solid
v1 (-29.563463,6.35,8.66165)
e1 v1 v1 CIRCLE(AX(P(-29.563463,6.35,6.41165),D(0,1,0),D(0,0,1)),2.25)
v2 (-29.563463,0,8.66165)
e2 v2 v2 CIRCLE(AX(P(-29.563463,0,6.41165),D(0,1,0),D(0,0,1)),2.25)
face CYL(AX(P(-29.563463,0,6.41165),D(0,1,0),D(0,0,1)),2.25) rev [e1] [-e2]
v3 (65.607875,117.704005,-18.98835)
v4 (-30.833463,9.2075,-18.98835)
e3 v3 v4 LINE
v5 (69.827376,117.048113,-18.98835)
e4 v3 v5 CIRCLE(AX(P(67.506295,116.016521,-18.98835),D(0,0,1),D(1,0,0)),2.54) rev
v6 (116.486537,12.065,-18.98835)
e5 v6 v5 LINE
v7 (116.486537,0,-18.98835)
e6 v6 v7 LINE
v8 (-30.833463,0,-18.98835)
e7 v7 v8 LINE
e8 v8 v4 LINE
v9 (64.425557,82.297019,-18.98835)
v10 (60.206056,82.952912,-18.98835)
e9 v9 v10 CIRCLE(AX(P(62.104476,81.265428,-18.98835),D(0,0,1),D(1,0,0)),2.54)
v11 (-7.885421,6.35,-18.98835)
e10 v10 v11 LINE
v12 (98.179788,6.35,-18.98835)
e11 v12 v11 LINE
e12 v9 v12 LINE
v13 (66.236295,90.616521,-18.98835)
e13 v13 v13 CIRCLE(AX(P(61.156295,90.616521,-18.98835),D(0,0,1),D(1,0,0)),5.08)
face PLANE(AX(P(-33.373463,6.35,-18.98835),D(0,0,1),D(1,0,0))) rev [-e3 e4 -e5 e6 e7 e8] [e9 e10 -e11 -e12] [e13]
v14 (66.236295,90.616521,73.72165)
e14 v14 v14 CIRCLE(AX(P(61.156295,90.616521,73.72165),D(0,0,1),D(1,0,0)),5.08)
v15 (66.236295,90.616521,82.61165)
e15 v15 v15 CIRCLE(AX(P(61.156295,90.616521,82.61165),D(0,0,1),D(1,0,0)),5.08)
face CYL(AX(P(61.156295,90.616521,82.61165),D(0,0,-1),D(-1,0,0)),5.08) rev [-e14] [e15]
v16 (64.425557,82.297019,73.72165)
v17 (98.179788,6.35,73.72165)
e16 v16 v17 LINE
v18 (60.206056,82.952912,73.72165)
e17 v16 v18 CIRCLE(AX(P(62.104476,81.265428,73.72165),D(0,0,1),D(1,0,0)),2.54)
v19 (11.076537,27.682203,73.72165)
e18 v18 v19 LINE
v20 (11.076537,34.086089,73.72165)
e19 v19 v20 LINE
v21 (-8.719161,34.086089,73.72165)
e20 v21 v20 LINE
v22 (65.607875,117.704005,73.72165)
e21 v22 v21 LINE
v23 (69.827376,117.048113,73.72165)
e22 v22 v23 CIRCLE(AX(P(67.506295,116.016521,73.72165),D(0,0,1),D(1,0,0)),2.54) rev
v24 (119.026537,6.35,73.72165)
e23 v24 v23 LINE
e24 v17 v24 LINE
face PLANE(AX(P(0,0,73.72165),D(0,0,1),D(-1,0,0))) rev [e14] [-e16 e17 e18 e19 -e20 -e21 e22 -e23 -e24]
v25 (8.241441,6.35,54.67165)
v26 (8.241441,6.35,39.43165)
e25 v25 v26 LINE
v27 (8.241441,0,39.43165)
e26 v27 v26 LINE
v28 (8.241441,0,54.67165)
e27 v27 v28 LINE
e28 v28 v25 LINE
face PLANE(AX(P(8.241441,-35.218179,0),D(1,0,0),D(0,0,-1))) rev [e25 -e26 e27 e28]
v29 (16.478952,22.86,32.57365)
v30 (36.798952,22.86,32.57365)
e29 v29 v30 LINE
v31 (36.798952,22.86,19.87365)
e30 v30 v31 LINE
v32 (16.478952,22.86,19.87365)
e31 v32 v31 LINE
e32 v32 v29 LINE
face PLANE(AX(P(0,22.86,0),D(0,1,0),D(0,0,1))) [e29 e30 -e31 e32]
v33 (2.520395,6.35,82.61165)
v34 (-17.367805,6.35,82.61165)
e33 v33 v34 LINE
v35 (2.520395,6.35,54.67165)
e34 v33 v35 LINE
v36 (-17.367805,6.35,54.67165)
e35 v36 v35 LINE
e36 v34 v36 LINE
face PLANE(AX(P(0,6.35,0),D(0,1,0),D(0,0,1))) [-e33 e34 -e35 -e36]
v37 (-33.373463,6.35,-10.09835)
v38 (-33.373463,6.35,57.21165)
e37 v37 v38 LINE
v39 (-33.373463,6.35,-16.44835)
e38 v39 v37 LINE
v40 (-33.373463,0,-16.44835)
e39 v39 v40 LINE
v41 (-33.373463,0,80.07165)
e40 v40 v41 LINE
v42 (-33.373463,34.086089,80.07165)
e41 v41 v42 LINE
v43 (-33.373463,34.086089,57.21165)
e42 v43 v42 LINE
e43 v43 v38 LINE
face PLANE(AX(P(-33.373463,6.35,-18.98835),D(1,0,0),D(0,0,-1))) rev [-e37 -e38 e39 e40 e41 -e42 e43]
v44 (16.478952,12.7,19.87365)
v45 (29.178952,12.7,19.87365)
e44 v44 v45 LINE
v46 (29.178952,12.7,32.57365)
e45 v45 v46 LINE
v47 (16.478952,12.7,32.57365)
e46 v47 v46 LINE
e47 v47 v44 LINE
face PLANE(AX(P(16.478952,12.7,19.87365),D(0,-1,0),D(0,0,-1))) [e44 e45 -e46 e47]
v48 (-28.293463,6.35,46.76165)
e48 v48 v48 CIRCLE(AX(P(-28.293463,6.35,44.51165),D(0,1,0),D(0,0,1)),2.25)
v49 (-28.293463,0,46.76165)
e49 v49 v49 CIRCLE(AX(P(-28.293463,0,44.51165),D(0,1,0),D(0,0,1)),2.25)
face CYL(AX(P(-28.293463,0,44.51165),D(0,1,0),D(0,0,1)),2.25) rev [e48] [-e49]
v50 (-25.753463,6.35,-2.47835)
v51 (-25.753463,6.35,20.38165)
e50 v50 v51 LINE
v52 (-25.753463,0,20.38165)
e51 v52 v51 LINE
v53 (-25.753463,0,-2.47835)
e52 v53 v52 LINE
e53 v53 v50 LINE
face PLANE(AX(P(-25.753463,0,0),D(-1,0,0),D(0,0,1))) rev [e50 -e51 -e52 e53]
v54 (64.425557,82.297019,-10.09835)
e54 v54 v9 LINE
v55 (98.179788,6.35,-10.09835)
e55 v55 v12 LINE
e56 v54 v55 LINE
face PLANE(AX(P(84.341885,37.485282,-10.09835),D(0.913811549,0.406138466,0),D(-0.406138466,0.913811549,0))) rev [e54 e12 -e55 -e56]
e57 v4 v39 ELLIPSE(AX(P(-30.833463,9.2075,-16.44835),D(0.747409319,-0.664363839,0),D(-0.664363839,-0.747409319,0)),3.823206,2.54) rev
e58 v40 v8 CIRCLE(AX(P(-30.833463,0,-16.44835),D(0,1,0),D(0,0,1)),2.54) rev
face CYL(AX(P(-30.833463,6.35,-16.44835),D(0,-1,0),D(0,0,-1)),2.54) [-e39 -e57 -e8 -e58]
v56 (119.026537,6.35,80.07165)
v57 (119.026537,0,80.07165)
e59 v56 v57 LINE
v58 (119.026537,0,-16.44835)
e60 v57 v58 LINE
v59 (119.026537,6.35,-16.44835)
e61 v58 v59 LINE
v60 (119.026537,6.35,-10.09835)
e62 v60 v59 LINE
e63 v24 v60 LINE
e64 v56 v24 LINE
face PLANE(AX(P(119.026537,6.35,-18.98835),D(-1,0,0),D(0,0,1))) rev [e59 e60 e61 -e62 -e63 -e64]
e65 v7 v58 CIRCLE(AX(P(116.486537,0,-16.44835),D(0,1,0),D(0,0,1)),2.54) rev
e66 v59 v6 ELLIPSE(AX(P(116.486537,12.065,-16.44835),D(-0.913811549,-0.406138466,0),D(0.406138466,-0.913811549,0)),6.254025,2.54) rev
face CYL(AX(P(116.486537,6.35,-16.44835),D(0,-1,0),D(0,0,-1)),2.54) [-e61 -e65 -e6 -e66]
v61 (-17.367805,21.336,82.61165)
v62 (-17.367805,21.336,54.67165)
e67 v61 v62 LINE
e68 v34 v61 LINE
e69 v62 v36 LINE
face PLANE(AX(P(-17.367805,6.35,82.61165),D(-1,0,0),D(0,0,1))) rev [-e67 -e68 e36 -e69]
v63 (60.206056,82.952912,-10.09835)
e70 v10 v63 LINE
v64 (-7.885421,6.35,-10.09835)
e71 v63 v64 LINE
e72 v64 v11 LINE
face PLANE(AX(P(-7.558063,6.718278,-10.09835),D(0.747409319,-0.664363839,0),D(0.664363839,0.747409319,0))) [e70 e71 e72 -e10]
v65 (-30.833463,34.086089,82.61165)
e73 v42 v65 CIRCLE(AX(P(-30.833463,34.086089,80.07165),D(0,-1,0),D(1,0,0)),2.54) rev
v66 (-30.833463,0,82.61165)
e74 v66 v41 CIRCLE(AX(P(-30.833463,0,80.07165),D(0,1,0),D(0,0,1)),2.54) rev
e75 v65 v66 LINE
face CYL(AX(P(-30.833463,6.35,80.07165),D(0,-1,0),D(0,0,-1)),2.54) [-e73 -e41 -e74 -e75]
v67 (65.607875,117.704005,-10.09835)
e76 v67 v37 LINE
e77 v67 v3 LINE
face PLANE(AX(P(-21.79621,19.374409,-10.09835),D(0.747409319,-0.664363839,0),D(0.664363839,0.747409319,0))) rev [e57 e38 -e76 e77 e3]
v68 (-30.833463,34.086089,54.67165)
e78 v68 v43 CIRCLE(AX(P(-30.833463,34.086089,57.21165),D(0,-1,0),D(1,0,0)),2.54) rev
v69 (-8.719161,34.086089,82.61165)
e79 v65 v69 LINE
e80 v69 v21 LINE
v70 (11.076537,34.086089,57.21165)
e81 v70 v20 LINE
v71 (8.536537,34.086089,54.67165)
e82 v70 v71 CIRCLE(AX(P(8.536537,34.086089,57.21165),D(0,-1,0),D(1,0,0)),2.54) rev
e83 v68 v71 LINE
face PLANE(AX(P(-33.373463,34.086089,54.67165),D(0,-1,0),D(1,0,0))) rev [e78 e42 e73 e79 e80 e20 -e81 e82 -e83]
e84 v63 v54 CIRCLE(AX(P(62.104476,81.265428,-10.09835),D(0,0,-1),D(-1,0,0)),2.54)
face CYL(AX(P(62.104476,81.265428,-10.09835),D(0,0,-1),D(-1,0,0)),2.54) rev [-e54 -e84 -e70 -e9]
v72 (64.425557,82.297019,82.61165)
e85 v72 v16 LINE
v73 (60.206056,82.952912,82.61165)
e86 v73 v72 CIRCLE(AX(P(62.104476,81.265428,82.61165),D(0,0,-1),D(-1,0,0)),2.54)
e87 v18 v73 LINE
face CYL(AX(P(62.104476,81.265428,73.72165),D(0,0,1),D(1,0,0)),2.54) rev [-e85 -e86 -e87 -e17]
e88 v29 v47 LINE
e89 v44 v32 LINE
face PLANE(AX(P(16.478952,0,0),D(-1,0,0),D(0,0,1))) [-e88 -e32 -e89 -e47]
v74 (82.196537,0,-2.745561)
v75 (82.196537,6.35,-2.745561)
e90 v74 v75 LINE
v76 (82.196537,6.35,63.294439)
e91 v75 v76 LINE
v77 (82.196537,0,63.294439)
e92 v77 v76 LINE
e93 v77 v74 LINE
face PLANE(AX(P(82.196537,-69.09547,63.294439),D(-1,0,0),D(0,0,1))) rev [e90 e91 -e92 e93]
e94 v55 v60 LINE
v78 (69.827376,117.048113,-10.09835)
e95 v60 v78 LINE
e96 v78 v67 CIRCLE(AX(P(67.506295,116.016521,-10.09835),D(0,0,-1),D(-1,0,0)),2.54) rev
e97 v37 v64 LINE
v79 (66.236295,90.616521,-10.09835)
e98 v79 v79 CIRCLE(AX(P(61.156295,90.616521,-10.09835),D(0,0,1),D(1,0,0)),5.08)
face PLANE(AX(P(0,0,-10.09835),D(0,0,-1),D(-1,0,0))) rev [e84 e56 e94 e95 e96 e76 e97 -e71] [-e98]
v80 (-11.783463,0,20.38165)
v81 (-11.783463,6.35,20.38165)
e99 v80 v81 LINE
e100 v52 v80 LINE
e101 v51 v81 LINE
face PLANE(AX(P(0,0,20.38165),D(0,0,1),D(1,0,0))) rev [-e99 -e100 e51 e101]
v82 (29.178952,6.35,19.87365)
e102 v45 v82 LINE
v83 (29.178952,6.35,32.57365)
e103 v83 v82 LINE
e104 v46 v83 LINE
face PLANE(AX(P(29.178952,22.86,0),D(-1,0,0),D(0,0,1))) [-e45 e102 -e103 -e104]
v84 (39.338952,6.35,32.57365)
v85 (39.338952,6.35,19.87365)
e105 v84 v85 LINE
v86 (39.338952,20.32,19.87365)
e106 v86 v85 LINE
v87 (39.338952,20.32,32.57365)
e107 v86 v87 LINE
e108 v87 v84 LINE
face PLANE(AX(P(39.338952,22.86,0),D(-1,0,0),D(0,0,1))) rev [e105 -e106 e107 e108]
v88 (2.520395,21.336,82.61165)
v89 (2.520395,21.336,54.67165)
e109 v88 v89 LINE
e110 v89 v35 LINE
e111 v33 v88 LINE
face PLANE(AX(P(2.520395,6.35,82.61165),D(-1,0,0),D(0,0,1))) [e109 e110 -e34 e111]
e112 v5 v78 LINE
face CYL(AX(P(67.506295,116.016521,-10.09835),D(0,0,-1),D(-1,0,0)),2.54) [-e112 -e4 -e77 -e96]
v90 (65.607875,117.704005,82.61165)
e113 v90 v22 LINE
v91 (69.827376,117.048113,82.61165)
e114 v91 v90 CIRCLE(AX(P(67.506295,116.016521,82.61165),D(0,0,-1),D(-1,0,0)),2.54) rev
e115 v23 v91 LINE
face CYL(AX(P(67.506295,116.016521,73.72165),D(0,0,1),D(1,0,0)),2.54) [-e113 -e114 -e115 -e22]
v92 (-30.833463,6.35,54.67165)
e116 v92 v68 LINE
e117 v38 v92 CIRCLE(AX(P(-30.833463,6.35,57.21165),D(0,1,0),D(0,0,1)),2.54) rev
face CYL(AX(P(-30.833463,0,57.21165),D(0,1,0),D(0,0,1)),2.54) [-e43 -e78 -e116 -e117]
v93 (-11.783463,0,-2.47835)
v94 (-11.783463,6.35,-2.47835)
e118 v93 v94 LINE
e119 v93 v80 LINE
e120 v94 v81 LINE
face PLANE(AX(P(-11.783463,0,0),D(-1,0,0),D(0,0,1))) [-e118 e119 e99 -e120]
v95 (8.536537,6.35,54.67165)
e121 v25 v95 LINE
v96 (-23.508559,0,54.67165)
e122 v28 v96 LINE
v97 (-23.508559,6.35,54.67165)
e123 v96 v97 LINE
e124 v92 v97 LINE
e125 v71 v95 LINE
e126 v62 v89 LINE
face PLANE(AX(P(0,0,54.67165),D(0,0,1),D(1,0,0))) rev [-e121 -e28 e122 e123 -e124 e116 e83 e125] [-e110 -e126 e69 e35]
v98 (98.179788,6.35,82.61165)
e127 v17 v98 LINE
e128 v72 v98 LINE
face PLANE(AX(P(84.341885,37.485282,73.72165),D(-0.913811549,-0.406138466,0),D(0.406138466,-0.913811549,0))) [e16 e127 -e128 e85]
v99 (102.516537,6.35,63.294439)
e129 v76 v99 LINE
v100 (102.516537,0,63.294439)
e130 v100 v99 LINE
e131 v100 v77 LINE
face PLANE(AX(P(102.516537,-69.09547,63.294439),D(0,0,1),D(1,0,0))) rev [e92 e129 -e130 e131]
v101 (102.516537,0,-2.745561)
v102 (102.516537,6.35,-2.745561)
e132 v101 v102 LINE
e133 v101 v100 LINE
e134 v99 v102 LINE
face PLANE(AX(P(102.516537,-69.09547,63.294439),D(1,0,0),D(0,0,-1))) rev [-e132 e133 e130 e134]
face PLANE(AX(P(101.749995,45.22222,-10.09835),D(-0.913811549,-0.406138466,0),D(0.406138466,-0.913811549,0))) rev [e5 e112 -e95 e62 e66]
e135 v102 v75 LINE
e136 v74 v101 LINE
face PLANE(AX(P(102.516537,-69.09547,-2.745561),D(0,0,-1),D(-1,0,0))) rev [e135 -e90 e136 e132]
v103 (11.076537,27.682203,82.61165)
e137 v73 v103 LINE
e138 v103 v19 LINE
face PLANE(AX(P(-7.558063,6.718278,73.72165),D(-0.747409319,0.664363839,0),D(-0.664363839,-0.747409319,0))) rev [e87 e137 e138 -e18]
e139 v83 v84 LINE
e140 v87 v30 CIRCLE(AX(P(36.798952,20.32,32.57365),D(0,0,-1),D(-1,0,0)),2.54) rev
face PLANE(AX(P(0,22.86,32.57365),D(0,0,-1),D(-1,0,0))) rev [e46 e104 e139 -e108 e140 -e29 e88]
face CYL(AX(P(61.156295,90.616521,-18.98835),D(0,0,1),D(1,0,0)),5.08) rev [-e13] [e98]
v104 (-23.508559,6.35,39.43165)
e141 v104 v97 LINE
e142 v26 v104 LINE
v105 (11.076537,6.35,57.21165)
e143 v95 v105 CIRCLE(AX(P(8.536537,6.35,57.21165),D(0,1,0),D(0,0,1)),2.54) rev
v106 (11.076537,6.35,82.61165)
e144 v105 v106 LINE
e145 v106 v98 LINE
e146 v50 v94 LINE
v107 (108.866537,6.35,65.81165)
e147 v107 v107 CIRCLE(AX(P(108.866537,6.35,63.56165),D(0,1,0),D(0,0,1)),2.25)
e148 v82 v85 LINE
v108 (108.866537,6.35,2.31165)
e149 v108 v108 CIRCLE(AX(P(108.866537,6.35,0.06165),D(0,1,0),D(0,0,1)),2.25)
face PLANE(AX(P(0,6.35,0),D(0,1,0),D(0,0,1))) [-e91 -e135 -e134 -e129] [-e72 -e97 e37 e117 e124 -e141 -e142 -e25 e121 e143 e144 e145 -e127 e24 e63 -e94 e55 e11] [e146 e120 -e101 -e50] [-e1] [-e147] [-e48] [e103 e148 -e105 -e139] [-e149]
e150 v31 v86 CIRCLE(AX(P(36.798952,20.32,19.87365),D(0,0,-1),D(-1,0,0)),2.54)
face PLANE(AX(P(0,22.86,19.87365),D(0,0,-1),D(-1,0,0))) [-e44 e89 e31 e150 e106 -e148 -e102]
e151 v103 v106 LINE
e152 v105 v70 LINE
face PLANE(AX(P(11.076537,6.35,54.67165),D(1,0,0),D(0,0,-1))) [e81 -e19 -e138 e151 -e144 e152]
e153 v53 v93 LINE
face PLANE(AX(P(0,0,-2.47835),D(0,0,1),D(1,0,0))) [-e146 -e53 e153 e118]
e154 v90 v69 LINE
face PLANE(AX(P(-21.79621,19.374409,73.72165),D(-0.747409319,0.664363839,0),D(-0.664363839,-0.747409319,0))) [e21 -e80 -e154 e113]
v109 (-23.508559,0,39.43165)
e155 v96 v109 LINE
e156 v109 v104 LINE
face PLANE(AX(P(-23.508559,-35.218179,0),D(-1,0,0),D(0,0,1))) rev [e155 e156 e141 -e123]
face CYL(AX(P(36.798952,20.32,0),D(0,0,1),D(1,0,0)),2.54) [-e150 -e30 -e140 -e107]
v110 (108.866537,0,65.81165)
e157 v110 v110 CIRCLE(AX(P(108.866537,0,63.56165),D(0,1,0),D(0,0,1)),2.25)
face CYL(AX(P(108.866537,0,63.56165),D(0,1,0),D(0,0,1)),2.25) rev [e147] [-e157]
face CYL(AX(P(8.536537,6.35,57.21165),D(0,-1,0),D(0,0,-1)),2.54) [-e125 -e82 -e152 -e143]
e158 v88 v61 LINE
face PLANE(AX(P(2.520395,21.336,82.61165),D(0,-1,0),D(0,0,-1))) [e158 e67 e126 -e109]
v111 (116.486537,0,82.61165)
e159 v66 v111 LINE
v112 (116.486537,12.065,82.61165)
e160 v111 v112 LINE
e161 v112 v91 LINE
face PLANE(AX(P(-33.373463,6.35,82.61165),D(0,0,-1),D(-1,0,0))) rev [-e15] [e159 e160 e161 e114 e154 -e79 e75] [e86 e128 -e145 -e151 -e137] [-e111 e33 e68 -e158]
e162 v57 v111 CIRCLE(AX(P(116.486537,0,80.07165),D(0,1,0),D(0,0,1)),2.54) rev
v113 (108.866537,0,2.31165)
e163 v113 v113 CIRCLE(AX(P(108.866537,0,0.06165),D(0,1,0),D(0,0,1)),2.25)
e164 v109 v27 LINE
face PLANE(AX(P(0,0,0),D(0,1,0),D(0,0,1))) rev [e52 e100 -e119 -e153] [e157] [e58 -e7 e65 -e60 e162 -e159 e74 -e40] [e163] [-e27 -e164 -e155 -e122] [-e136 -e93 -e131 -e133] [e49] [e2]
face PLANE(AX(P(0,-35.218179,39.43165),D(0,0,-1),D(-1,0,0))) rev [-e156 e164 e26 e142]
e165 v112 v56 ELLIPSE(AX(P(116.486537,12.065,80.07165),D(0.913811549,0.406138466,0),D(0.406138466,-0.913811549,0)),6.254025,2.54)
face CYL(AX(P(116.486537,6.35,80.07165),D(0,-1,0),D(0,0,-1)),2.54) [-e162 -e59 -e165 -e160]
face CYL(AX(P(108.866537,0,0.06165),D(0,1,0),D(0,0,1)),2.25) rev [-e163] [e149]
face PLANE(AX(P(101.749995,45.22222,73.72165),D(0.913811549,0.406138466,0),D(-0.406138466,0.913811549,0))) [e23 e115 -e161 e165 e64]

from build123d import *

# Parameters (mm, degrees)
SKETCH2_W               = 152.4
SKETCH2_H               = 101.6
BOSS_EXTRUDE1_DEPTH     = 6.35
BOSS_EXTRUDE2_DEPTH     = 8.89
FILLET1_R               = 2.54
SKETCH5_R               = 5.08
CUT_EXTRUDE1_DEPTH      = 192.880455786
MIRROR1_START           = 73.721650485
MIRROR1_OUTLINE_R       = 5.08
MIRROR1_DEPTH           = 8.89
SKETCH12_W              = 44.45
SKETCH12_H              = 27.736089271
BOSS_EXTRUDE4_DEPTH     = 19.05
BOSS_EXTRUDE5_DEPTH     = 8.89
CUT_EXTRUDE4_DEPTH      = 19.05
CUT_EXTRUDE4_DEPTH_BACK = 192.880455786
SKETCH12_4_W            = 19.8882
SKETCH12_4_H            = 14.986
CUT_EXTRUDE5_DEPTH      = 6.35
SKETCH18_W              = 20.32
SKETCH18_H              = 66.04
CUT_EXTRUDE6_DEPTH      = 6.35
SKETCH19_W              = 13.97
SKETCH19_H              = 22.86
CUT_EXTRUDE7_DEPTH      = 184.254753535
SKETCH20_R              = 2.25
SKETCH20_R_2            = 1.1303
CUT_EXTRUDE8_DEPTH      = 184.254753535
SKETCH21_W              = 10.16
SKETCH21_H              = 12.7
BOSS_EXTRUDE6_DEPTH     = 16.51
SKETCH22_W              = 12.7
SKETCH22_H              = 10.16
BOSS_EXTRUDE7_DEPTH     = 22.86
FILLET2_R               = 2.54
FILLET3_R               = 2.54


# Read off the part's stored shape, not the designer's step: Mirror1
with BuildPart() as part:
    # Sketch2 → Boss-Extrude1 (new body)
    with BuildSketch(Plane(origin=(0, 0, 0), x_dir=(1, 0, 0), z_dir=(0, 1, 0))):
        with Locations((42.826537217, -31.811650485)):
            Rectangle(SKETCH2_W, SKETCH2_H)
    extrude(amount=BOSS_EXTRUDE1_DEPTH)

    # Sketch4 → Boss-Extrude2 (add)
    with BuildSketch(Plane(origin=(0, 0, -18.988349515), x_dir=(-1, 0, 0), z_dir=(0, 0, -1))):
        Polygon((-98.179788203, 6.35), (-62.824718494, 85.898906846), (7.885420925, 6.35), (33.373462783, 6.35), (-68.226537217, 120.65), (-119.026537217, 6.35), align=None)
    extrude(amount=-BOSS_EXTRUDE2_DEPTH)

    # Fillet1
    fillet1_edges = [part.edges().sort_by_distance(p)[0] for p in [
        (62.824718494, 85.898906846, -14.543349515),
        (68.226537217, 120.65, -14.543349515),
    ]]
    fillet(fillet1_edges, radius=FILLET1_R)

    # Sketch5 → Cut-Extrude1 (cut, through all)
    with BuildSketch(Plane.XY.offset(-10.098349515)):
        with Locations((61.15629472, 90.616520913)):
            Circle(SKETCH5_R)
    extrude(amount=-CUT_EXTRUDE1_DEPTH, mode=Mode.SUBTRACT)

    # Mirror1 outline → Mirror1 (add)
    with BuildSketch(Plane.XY.offset(MIRROR1_START)):
        with BuildLine():
            ThreePointArc((60.206056328, 82.952911909), (62.494616288, 83.775286431), (64.425557331, 82.297019462))
            Line((64.425557331, 82.297019462), (98.179788203, 6.35))
            Line((98.179788203, 6.35), (119.026537217, 6.35))
            Line((119.026537217, 6.35), (69.827376054, 117.048112617))
            ThreePointArc((69.827376054, 117.048112617), (67.89643501, 118.526379585), (65.607875051, 117.704005063))
            Line((65.607875051, 117.704005063), (-33.373462783, 6.35))
            Line((-33.373462783, 6.35), (-7.885420925, 6.35))
            Line((-7.885420925, 6.35), (60.206056328, 82.952911909))
        make_face()
        with Locations((61.15629472, 90.616520913)):
            Circle(MIRROR1_OUTLINE_R, mode=Mode.SUBTRACT)
    extrude(amount=MIRROR1_DEPTH)

    # Sketch12 → Boss-Extrude4 (add)
    with BuildSketch(Plane(origin=(0, 0, 73.721650485), x_dir=(-1, 0, 0), z_dir=(0, 0, -1))):
        with Locations((11.148462783, 20.218044636)):
            Rectangle(SKETCH12_W, SKETCH12_H)
    extrude(amount=BOSS_EXTRUDE4_DEPTH)

    # Sketch15 → Boss-Extrude5 (add)
    with BuildSketch(Plane.XY.offset(73.721650485)):
        Polygon((-33.373462783, 34.086089271), (-33.373462783, 6.35), (-8.719161209, 34.086089271), align=None)
        Polygon((11.076537217, 27.682202909), (-7.885420925, 6.35), (11.076537217, 6.35), align=None)
    extrude(amount=BOSS_EXTRUDE5_DEPTH)

    # Sketch12<4> → Cut-Extrude4 (cut, two sides: drawn at the far end of the back side and taken through both)
    with BuildSketch(Plane(origin=(0, 0, 73.721650485), x_dir=(-1, 0, 0), z_dir=(0, 0, -1)).offset(-CUT_EXTRUDE4_DEPTH_BACK)):
        with Locations((7.42370528, 13.843)):
            Rectangle(SKETCH12_4_W, SKETCH12_4_H)
    extrude(amount=CUT_EXTRUDE4_DEPTH + CUT_EXTRUDE4_DEPTH_BACK, mode=Mode.SUBTRACT)

    # Sketch17 → Cut-Extrude5 (cut)
    with BuildSketch(Plane(origin=(0, 6.35, 0), x_dir=(1, 0, 0), z_dir=(0, 1, 0))):
        Polygon((-23.508558608, -40.828650485), (-9.633558608, -40.828650485), (-5.633558608, -40.828650485), (8.241441392, -40.828650485), (8.241441392, -39.431650485), (-23.508558608, -39.431650485), align=None)
        Polygon((-5.633558608, -40.828650485), (-9.633558608, -40.828650485), (-23.508558608, -40.828650485), (-23.508558608, -54.671650485), (-17.36780528, -54.671650485), (2.52039472, -54.671650485), (8.241441392, -54.671650485), (8.241441392, -40.828650485), align=None)
    extrude(amount=-CUT_EXTRUDE5_DEPTH, mode=Mode.SUBTRACT)

    # Sketch18 → Cut-Extrude6 (cut)
    with BuildSketch(Plane(origin=(0, 6.35, 0), x_dir=(1, 0, 0), z_dir=(0, 1, 0))):
        with Locations((92.356537217, -30.274439416)):
            Rectangle(SKETCH18_W, SKETCH18_H)
    extrude(amount=-CUT_EXTRUDE6_DEPTH, mode=Mode.SUBTRACT)

    # Sketch19 → Cut-Extrude7 (cut, through all)
    with BuildSketch(Plane(origin=(0, 6.35, 0), x_dir=(1, 0, 0), z_dir=(0, 1, 0))):
        with Locations((-18.768462783, -8.951650485)):
            Rectangle(SKETCH19_W, SKETCH19_H)
    extrude(amount=-CUT_EXTRUDE7_DEPTH, mode=Mode.SUBTRACT)

    # Sketch20 → Cut-Extrude8 (cut, through all)
    # profile 1 of 8: a face of its own
    with BuildSketch(Plane(origin=(0, 6.35, 0), x_dir=(1, 0, 0), z_dir=(0, 1, 0))):
        with Locations(Location((-29.563462783, -6.411650485, 0), (0, 0, 270))):
            Circle(SKETCH20_R)
        with Locations((-29.563462783, -6.411650485)):
            Circle(SKETCH20_R_2, mode=Mode.SUBTRACT)
    # profile 2 of 8: a face of its own
    with BuildSketch(Plane(origin=(0, 6.35, 0), x_dir=(1, 0, 0), z_dir=(0, 1, 0))):
        with Locations((-29.563462783, -6.411650485)):
            Circle(SKETCH20_R_2)
    # profile 3 of 8: a face of its own
    with BuildSketch(Plane(origin=(0, 6.35, 0), x_dir=(1, 0, 0), z_dir=(0, 1, 0))):
        with Locations(Location((-28.293462783, -44.511650485, 0), (0, 0, 270))):
            Circle(SKETCH20_R)
        with Locations((-28.293462783, -44.511650485)):
            Circle(SKETCH20_R_2, mode=Mode.SUBTRACT)
    # profile 4 of 8: a face of its own
    with BuildSketch(Plane(origin=(0, 6.35, 0), x_dir=(1, 0, 0), z_dir=(0, 1, 0))):
        with Locations((-28.293462783, -44.511650485)):
            Circle(SKETCH20_R_2)
    # profile 5 of 8: a face of its own
    with BuildSketch(Plane(origin=(0, 6.35, 0), x_dir=(1, 0, 0), z_dir=(0, 1, 0))):
        with Locations(Location((108.866537217, -0.061650485, 0), (0, 0, 270))):
            Circle(SKETCH20_R)
        with Locations((108.866537217, -0.061650485)):
            Circle(SKETCH20_R_2, mode=Mode.SUBTRACT)
    # profile 6 of 8: a face of its own
    with BuildSketch(Plane(origin=(0, 6.35, 0), x_dir=(1, 0, 0), z_dir=(0, 1, 0))):
        with Locations((108.866537217, -0.061650485)):
            Circle(SKETCH20_R_2)
    # profile 7 of 8: a face of its own
    with BuildSketch(Plane(origin=(0, 6.35, 0), x_dir=(1, 0, 0), z_dir=(0, 1, 0))):
        with Locations(Location((108.866537217, -63.561650485, 0), (0, 0, 270))):
            Circle(SKETCH20_R)
        with Locations((108.866537217, -63.561650485)):
            Circle(SKETCH20_R_2, mode=Mode.SUBTRACT)
    # profile 8 of 8: a face of its own
    with BuildSketch(Plane(origin=(0, 6.35, 0), x_dir=(1, 0, 0), z_dir=(0, 1, 0))):
        with Locations((108.866537217, -63.561650485)):
            Circle(SKETCH20_R_2)
    extrude(amount=-CUT_EXTRUDE8_DEPTH, mode=Mode.SUBTRACT)

    # Sketch21 → Boss-Extrude6 (add)
    with BuildSketch(Plane(origin=(0, 6.35, 0), x_dir=(1, 0, 0), z_dir=(0, 1, 0))):
        with Locations((34.258952171, -26.223650485)):
            Rectangle(SKETCH21_W, SKETCH21_H)
    extrude(amount=BOSS_EXTRUDE6_DEPTH)

    # Sketch22 → Boss-Extrude7 (add)
    with BuildSketch(Plane(origin=(39.338952171, 0, 0), x_dir=(0, 0, -1), z_dir=(1, 0, 0))):
        with Locations((-26.223650485, 17.78)):
            Rectangle(SKETCH22_W, SKETCH22_H)
    extrude(amount=-BOSS_EXTRUDE7_DEPTH)

    # Fillet2
    fillet2_edges = [part.edges().sort_by_distance(p)[0] for p in [
        (39.338952171, 22.86, 26.223650485),
    ]]
    fillet(fillet2_edges, radius=FILLET2_R)

    # Fillet3
    fillet3_edges = [part.edges().sort_by_distance(p)[0] for p in [
        (11.076537217, 20.218044635, 54.671650485),
        (-33.373462783, 20.218044635, 54.671650485),
        (-33.373462783, 3.175, -18.988349515),
        (119.026537217, 3.175, -18.988349515),
        (119.026537217, 3.175, 82.611650485),
        (-33.373462783, 17.043044635, 82.611650485),
    ]]
    fillet(fillet3_edges, radius=FILLET3_R)


solid = part.part
